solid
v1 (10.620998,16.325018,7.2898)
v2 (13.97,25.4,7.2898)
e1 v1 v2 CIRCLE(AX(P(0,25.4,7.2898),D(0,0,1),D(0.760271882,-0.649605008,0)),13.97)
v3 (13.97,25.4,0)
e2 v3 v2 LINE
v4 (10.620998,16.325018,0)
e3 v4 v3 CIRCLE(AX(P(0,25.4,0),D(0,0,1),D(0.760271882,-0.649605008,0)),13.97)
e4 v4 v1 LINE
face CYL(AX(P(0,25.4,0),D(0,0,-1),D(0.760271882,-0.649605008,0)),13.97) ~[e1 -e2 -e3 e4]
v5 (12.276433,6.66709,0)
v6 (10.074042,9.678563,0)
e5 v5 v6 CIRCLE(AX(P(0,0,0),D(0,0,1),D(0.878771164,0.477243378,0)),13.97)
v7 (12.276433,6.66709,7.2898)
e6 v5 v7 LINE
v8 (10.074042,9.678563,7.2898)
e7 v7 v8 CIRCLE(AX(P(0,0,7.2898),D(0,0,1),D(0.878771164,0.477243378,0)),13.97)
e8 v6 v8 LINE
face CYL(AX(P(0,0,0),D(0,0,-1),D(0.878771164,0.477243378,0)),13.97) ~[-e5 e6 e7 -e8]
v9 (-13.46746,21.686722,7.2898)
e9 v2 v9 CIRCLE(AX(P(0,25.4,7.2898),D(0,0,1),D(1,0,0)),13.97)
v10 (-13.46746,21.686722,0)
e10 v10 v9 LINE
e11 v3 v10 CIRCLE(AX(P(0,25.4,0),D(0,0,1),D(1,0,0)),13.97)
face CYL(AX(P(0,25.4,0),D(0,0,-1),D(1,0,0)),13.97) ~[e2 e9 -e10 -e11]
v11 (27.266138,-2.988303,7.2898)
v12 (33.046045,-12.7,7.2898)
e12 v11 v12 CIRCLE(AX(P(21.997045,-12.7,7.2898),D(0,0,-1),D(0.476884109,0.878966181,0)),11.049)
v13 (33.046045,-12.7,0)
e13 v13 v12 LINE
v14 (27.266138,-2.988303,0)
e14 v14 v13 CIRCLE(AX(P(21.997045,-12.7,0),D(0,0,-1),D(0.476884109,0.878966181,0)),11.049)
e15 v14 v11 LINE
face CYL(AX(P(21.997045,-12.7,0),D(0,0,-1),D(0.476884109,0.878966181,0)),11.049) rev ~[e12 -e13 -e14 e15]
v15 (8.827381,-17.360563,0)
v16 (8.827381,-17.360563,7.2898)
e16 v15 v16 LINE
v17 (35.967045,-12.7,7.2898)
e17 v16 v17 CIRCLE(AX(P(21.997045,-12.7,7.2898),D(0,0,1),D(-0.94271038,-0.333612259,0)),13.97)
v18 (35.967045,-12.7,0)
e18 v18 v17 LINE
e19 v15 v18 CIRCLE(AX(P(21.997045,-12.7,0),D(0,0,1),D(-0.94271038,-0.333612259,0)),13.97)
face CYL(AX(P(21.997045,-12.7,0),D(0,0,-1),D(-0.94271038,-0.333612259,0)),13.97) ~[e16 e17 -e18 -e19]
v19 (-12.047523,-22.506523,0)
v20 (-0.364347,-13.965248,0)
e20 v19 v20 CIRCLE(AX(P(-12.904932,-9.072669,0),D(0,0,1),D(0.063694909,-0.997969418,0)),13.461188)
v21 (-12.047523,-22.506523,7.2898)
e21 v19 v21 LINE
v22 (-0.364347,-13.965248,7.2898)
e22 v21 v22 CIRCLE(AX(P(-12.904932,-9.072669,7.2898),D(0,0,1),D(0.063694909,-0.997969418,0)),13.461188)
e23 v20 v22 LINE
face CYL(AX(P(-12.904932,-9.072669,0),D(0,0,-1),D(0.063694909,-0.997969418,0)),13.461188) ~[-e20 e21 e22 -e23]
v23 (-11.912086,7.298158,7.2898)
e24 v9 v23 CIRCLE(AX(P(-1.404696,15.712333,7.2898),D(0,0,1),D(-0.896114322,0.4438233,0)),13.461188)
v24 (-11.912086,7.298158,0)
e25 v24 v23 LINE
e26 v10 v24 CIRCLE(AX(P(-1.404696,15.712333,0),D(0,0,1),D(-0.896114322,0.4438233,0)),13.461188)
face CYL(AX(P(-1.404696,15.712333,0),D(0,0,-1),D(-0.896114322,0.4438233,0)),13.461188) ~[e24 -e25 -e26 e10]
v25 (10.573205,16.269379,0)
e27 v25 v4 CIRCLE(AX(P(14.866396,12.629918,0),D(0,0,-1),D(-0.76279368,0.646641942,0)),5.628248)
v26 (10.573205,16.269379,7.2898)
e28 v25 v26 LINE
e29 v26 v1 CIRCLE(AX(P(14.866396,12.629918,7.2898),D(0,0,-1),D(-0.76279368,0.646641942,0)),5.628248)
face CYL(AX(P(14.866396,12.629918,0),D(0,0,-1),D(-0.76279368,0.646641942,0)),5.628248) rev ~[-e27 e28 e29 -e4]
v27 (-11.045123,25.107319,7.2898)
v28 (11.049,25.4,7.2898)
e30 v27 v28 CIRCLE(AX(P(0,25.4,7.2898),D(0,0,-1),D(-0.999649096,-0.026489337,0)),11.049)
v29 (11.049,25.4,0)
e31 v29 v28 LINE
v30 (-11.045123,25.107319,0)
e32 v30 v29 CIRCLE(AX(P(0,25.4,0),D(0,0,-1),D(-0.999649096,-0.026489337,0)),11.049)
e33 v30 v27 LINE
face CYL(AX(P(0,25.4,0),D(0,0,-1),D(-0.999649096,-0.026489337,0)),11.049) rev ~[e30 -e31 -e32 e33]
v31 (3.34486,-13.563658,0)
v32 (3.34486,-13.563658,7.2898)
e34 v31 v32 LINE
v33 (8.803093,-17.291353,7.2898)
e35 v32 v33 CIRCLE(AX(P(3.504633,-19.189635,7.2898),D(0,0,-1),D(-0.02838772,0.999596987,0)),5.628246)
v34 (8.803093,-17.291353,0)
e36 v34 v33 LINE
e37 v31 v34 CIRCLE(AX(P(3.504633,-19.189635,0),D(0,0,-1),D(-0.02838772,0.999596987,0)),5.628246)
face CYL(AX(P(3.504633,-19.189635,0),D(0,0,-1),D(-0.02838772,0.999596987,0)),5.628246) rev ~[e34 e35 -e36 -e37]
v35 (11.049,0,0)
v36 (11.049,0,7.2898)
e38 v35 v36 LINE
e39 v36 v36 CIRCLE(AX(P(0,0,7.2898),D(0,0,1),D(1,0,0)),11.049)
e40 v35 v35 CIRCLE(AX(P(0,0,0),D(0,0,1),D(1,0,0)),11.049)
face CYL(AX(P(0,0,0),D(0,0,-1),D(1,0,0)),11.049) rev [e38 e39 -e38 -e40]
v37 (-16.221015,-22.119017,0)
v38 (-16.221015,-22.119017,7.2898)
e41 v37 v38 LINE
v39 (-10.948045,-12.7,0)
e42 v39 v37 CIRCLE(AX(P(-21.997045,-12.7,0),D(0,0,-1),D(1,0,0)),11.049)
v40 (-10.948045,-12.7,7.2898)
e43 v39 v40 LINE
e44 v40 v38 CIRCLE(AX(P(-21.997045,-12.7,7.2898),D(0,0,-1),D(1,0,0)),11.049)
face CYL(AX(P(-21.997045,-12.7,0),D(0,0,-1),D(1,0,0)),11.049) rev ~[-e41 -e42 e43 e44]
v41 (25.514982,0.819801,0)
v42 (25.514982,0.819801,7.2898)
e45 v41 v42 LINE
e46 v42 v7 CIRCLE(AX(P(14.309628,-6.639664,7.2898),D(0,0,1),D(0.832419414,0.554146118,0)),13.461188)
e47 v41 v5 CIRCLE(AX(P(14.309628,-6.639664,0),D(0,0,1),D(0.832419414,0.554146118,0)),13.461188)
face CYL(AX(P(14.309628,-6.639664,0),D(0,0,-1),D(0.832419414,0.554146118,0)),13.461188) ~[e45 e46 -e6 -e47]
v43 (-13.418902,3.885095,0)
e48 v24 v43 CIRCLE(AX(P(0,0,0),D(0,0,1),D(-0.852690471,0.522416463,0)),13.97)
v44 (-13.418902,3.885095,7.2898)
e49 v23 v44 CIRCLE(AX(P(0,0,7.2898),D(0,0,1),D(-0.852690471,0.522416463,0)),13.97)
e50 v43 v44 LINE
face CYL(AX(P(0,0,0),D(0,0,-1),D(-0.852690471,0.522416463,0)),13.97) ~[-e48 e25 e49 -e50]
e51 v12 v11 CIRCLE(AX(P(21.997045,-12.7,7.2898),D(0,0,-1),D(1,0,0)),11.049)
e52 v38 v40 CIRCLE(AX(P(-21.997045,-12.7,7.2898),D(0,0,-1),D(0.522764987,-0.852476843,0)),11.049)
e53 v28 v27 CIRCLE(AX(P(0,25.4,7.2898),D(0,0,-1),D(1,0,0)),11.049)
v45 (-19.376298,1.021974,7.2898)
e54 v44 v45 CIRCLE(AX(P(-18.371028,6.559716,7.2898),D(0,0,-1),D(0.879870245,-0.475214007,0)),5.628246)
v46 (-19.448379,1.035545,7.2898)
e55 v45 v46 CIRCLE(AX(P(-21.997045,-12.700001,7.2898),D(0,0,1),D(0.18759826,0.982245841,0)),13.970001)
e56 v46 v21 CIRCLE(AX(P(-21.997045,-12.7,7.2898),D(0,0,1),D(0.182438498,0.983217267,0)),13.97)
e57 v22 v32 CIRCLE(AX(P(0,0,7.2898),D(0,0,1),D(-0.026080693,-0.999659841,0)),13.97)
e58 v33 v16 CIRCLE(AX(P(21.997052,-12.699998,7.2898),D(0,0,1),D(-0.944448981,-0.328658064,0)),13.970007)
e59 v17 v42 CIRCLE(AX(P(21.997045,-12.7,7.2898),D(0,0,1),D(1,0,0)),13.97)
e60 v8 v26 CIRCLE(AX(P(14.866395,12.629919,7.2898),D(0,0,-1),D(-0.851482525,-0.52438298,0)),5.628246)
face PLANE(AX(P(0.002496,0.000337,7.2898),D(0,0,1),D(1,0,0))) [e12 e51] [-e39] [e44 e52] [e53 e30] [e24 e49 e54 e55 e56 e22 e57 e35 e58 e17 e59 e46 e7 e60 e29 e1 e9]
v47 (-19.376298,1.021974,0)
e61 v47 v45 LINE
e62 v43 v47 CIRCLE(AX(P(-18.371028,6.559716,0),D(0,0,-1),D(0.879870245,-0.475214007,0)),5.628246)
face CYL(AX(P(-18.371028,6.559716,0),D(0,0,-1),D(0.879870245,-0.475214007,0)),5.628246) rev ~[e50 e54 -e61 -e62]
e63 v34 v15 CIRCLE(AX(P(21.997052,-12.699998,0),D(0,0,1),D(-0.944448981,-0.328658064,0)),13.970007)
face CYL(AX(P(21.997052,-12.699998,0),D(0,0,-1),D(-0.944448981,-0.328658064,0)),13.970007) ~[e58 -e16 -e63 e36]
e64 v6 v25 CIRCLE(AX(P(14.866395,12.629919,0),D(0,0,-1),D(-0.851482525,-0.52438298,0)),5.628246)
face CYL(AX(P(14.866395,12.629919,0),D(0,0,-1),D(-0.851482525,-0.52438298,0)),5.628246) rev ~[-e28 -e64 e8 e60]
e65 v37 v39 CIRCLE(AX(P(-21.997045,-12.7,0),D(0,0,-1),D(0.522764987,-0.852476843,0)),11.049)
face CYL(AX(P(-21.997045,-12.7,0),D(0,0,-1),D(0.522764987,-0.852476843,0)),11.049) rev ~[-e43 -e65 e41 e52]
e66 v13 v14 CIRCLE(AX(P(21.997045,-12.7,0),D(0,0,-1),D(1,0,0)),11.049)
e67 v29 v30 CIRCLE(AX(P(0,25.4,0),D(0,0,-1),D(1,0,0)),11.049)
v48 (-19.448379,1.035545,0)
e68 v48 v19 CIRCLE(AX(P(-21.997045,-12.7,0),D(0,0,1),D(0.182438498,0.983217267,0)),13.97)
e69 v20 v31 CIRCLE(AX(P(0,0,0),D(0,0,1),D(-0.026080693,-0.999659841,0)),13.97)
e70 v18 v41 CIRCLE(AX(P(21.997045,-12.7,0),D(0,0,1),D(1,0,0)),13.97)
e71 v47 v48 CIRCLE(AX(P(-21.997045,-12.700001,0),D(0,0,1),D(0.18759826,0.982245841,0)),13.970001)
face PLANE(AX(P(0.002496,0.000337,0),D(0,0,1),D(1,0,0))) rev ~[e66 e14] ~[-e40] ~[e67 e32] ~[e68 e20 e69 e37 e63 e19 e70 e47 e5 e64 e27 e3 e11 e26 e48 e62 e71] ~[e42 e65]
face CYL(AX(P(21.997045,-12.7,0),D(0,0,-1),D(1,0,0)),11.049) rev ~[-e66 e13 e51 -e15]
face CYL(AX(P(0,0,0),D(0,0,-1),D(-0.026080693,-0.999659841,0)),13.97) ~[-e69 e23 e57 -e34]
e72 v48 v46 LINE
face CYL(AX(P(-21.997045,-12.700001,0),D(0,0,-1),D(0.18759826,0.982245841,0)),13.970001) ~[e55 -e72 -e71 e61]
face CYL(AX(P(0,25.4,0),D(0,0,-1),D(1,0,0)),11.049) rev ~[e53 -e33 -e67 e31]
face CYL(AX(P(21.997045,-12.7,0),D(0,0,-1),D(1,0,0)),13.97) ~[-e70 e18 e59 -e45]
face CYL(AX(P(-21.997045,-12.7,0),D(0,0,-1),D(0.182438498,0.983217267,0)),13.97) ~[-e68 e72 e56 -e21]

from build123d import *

# Parameters (mm, degrees)
F0_R     = 11.049
F1_DEPTH = 7.2898


# Not quite as in the source:
# - a feature names something its author has since deleted; it is built from what else it names


with BuildPart() as f1:
    # F0 (on Top) → F1 (new body)
    with BuildSketch(Plane.XY):
        with BuildLine():
            ThreePointArc((13.9084581944, -1.3098437524), (13.9546060671, -0.655644349), (13.97, 0))
            ThreePointArc((13.97, 0), (13.5399902372, 3.4394133768), (12.2764331601, 6.6670899848))
            ThreePointArc((12.2764331601, 6.6670899848), (11.2762217496, 8.2466795168), (10.0740419848, 9.6785628111))
            ThreePointArc((10.0740419848, 9.6785628111), (8.0892761862, 11.3896668425), (5.8198711326, 12.7))
            ThreePointArc((5.8198711326, 12.7), (0, 11.43), (-5.8198711326, 12.7))
            ThreePointArc((-5.8198711326, 12.7), (-9.2682549118, 10.4527676187), (-11.9120858762, 7.2981579921))
            ThreePointArc((-11.9120858762, 7.2981579921), (-12.7799448333, 5.6421547355), (-13.4189022589, 3.8850948721))
            ThreePointArc((-13.4189022589, 3.8850948721), (-13.9083789193, 1.3106852543), (-13.9084581944, -1.3098437524))
            ThreePointArc((-13.9084581944, -1.3098437524), (-9.8986703653, -5.715), (-8.0885870618, -11.3901562476))
            ThreePointArc((-8.0885870618, -11.3901562476), (-4.4182348417, -13.2529280117), (-0.3643472839, -13.9652479769))
            ThreePointArc((-0.3643472839, -13.9652479769), (1.5037230836, -13.8888342523), (3.3448602741, -13.5636576832))
            ThreePointArc((3.3448602741, -13.5636576832), (5.8191027331, -12.7003520968), (8.0885870618, -11.3901562476))
            ThreePointArc((8.0885870618, -11.3901562476), (9.8986703653, -5.715), (13.9084581944, -1.3098437524))
        make_face()
        Circle(F0_R, mode=Mode.SUBTRACT)
        with BuildLine():
            ThreePointArc((12.2764331601, 6.6670899848), (13.5399902372, 3.4394133768), (13.97, 0))
            ThreePointArc((13.97, 0), (13.9546060671, -0.655644349), (13.9084581944, -1.3098437524))
            ThreePointArc((13.9084581944, -1.3098437524), (19.4758239296, 1.0406092668), (25.5149823418, 0.8198009845))
            ThreePointArc((25.5149823418, 0.8198009845), (19.7483617265, 5.673895919), (12.2764331601, 6.6670899848))
        make_face()
        with BuildLine():
            ThreePointArc((25.5149823418, 0.8198009845), (19.4758239296, 1.0406092668), (13.9084581944, -1.3098437524))
            ThreePointArc((13.9084581944, -1.3098437524), (12.0983748909, -6.985), (8.0885870618, -11.3901562476))
            ThreePointArc((8.0885870618, -11.3901562476), (8.1283324688, -14.3791979101), (8.8030929872, -17.2913531259))
            ThreePointArc((8.8030929872, -17.2913531259), (8.8153498636, -17.3259186272), (8.8273812481, -17.3605632616))
            ThreePointArc((8.8273812481, -17.3605632616), (24.3614367008, -26.4684622633), (35.9670452561, -12.7))
            ThreePointArc((35.9670452561, -12.7), (33.0493409698, -4.1555480306), (25.5149823418, 0.8198009845))
        make_face()
        with BuildLine():
            ThreePointArc((33.0460452561, -12.7), (12.502346623, -18.3507609104), (27.2661377773, -2.9883026713))
            ThreePointArc((27.2661377773, -2.9883026713), (31.4917438892, -7.0492390896), (33.0460452561, -12.7))
        make_face(mode=Mode.SUBTRACT)
        with BuildLine():
            ThreePointArc((8.0885870618, -11.3901562476), (12.0983748909, -6.985), (13.9084581944, -1.3098437524))
            ThreePointArc((13.9084581944, -1.3098437524), (9.8986703653, -5.715), (8.0885870618, -11.3901562476))
        make_face()
        with BuildLine():
            ThreePointArc((5.8198711326, 12.7), (8.0892761862, 11.3896668425), (10.0740419848, 9.6785628111))
            ThreePointArc((10.0740419848, 9.6785628111), (9.2542217215, 13.054963054), (10.5732045792, 16.2693787218))
            ThreePointArc((10.5732045792, 16.2693787218), (8.3885844419, 14.2289413634), (5.8198711326, 12.7))
        make_face()
        with BuildLine():
            ThreePointArc((8.8030929872, -17.2913531259), (8.1283324688, -14.3791979101), (8.0885870618, -11.3901562476))
            ThreePointArc((8.0885870618, -11.3901562476), (5.8191027331, -12.7003520968), (3.3448602741, -13.5636576832))
            ThreePointArc((3.3448602741, -13.5636576832), (6.6788187895, -14.54187263), (8.8030929872, -17.2913531259))
        make_face()
        with BuildLine():
            ThreePointArc((-5.8198711326, 12.7), (0, 11.43), (5.8198711326, 12.7))
            ThreePointArc((5.8198711326, 12.7), (0, 13.97), (-5.8198711326, 12.7))
        make_face()
        with BuildLine():
            ThreePointArc((-5.8198711326, 12.7), (0, 13.97), (5.8198711326, 12.7))
            ThreePointArc((5.8198711326, 12.7), (8.3885844419, 14.2289413634), (10.5732045792, 16.2693787218))
            ThreePointArc((10.5732045792, 16.2693787218), (10.5970107433, 16.2972762387), (10.6209981845, 16.3250180405))
            ThreePointArc((10.6209981845, 16.3250180405), (13.1060338134, 20.563391924), (13.97, 25.4))
            ThreePointArc((13.97, 25.4), (-1.87356461, 39.2437948429), (-13.4674596495, 21.6867223928))
            ThreePointArc((-13.4674596495, 21.6867223928), (-10.6391060252, 16.3462536492), (-5.8198711326, 12.7))
        make_face()
        with BuildLine():
            ThreePointArc((11.049, 25.4), (0.1463531826, 14.3519693273), (-11.0451228611, 25.1073193139))
            ThreePointArc((-11.0451228611, 25.1073193139), (-0.1463531826, 36.4480306727), (11.049, 25.4))
        make_face(mode=Mode.SUBTRACT)
        with BuildLine():
            ThreePointArc((8.8273812481, -17.3605632616), (8.8153498636, -17.3259186272), (8.8030929872, -17.2913531259))
            ThreePointArc((8.8030929872, -17.2913531259), (8.8151916949, -17.3259741342), (8.8273812481, -17.3605632616))
        make_face()
        with BuildLine():
            ThreePointArc((-11.9120858762, 7.2981579921), (-9.2682549118, 10.4527676187), (-5.8198711326, 12.7))
            ThreePointArc((-5.8198711326, 12.7), (-10.6391060252, 16.3462536492), (-13.4674596495, 21.6867223928))
            ThreePointArc((-13.4674596495, 21.6867223928), (-14.7879188675, 14.2656349788), (-11.9120858762, 7.2981579921))
        make_face()
        with BuildLine():
            ThreePointArc((-12.0475226922, -22.5065233774), (-4.960442859, -19.9395308977), (-0.3643472839, -13.9652479769))
            ThreePointArc((-0.3643472839, -13.9652479769), (-4.4182348417, -13.2529280117), (-8.0885870618, -11.3901562476))
            ThreePointArc((-8.0885870618, -11.3901562476), (-8.042439189, -12.044355651), (-8.0270452561, -12.7))
            ThreePointArc((-8.0270452561, -12.7), (-9.0711849324, -17.9993428735), (-12.0475226922, -22.5065233774))
        make_face()
        with BuildLine():
            ThreePointArc((-8.0270452561, -12.7), (-8.042439189, -12.044355651), (-8.0885870618, -11.3901562476))
            ThreePointArc((-8.0885870618, -11.3901562476), (-12.0983748909, -6.985), (-13.9084581944, -1.3098437524))
            ThreePointArc((-13.9084581944, -1.3098437524), (-16.5169169106, 0.1502565467), (-19.3762975665, 1.0219744041))
            ThreePointArc((-19.3762975665, 1.0219744041), (-19.4123606069, 1.0286423885), (-19.4483794326, 1.0355452211))
            ThreePointArc((-19.4483794326, 1.0355452211), (-35.3240264115, -16.8895671954), (-12.0475226922, -22.5065233774))
            ThreePointArc((-12.0475226922, -22.5065233774), (-9.0711849324, -17.9993428735), (-8.0270452561, -12.7))
        make_face()
        with BuildLine():
            ThreePointArc((-10.9480452561, -12.7), (-12.3559934404, -18.0972697623), (-16.2210149162, -22.1190166425))
            ThreePointArc((-16.2210149162, -22.1190166425), (-31.6380970718, -7.3027302377), (-10.9480452561, -12.7))
        make_face(mode=Mode.SUBTRACT)
        with BuildLine():
            ThreePointArc((-13.9084581944, -1.3098437524), (-12.0983748909, -6.985), (-8.0885870618, -11.3901562476))
            ThreePointArc((-8.0885870618, -11.3901562476), (-9.8986703653, -5.715), (-13.9084581944, -1.3098437524))
        make_face()
        with BuildLine():
            ThreePointArc((-13.9084581944, -1.3098437524), (-13.9083789193, 1.3106852543), (-13.4189022589, 3.8850948721))
            ThreePointArc((-13.4189022589, 3.8850948721), (-15.933040511, 1.486909576), (-19.3762975665, 1.0219744041))
            ThreePointArc((-19.3762975665, 1.0219744041), (-16.5169169106, 0.1502565467), (-13.9084581944, -1.3098437524))
        make_face()
        with BuildLine():
            ThreePointArc((-19.3762975665, 1.0219744041), (-19.412329593, 1.0288071201), (-19.4483794326, 1.0355452211))
            ThreePointArc((-19.4483794326, 1.0355452211), (-19.4123606069, 1.0286423885), (-19.3762975665, 1.0219744041))
        make_face()
    extrude(amount=F1_DEPTH)


solid = f1.part
